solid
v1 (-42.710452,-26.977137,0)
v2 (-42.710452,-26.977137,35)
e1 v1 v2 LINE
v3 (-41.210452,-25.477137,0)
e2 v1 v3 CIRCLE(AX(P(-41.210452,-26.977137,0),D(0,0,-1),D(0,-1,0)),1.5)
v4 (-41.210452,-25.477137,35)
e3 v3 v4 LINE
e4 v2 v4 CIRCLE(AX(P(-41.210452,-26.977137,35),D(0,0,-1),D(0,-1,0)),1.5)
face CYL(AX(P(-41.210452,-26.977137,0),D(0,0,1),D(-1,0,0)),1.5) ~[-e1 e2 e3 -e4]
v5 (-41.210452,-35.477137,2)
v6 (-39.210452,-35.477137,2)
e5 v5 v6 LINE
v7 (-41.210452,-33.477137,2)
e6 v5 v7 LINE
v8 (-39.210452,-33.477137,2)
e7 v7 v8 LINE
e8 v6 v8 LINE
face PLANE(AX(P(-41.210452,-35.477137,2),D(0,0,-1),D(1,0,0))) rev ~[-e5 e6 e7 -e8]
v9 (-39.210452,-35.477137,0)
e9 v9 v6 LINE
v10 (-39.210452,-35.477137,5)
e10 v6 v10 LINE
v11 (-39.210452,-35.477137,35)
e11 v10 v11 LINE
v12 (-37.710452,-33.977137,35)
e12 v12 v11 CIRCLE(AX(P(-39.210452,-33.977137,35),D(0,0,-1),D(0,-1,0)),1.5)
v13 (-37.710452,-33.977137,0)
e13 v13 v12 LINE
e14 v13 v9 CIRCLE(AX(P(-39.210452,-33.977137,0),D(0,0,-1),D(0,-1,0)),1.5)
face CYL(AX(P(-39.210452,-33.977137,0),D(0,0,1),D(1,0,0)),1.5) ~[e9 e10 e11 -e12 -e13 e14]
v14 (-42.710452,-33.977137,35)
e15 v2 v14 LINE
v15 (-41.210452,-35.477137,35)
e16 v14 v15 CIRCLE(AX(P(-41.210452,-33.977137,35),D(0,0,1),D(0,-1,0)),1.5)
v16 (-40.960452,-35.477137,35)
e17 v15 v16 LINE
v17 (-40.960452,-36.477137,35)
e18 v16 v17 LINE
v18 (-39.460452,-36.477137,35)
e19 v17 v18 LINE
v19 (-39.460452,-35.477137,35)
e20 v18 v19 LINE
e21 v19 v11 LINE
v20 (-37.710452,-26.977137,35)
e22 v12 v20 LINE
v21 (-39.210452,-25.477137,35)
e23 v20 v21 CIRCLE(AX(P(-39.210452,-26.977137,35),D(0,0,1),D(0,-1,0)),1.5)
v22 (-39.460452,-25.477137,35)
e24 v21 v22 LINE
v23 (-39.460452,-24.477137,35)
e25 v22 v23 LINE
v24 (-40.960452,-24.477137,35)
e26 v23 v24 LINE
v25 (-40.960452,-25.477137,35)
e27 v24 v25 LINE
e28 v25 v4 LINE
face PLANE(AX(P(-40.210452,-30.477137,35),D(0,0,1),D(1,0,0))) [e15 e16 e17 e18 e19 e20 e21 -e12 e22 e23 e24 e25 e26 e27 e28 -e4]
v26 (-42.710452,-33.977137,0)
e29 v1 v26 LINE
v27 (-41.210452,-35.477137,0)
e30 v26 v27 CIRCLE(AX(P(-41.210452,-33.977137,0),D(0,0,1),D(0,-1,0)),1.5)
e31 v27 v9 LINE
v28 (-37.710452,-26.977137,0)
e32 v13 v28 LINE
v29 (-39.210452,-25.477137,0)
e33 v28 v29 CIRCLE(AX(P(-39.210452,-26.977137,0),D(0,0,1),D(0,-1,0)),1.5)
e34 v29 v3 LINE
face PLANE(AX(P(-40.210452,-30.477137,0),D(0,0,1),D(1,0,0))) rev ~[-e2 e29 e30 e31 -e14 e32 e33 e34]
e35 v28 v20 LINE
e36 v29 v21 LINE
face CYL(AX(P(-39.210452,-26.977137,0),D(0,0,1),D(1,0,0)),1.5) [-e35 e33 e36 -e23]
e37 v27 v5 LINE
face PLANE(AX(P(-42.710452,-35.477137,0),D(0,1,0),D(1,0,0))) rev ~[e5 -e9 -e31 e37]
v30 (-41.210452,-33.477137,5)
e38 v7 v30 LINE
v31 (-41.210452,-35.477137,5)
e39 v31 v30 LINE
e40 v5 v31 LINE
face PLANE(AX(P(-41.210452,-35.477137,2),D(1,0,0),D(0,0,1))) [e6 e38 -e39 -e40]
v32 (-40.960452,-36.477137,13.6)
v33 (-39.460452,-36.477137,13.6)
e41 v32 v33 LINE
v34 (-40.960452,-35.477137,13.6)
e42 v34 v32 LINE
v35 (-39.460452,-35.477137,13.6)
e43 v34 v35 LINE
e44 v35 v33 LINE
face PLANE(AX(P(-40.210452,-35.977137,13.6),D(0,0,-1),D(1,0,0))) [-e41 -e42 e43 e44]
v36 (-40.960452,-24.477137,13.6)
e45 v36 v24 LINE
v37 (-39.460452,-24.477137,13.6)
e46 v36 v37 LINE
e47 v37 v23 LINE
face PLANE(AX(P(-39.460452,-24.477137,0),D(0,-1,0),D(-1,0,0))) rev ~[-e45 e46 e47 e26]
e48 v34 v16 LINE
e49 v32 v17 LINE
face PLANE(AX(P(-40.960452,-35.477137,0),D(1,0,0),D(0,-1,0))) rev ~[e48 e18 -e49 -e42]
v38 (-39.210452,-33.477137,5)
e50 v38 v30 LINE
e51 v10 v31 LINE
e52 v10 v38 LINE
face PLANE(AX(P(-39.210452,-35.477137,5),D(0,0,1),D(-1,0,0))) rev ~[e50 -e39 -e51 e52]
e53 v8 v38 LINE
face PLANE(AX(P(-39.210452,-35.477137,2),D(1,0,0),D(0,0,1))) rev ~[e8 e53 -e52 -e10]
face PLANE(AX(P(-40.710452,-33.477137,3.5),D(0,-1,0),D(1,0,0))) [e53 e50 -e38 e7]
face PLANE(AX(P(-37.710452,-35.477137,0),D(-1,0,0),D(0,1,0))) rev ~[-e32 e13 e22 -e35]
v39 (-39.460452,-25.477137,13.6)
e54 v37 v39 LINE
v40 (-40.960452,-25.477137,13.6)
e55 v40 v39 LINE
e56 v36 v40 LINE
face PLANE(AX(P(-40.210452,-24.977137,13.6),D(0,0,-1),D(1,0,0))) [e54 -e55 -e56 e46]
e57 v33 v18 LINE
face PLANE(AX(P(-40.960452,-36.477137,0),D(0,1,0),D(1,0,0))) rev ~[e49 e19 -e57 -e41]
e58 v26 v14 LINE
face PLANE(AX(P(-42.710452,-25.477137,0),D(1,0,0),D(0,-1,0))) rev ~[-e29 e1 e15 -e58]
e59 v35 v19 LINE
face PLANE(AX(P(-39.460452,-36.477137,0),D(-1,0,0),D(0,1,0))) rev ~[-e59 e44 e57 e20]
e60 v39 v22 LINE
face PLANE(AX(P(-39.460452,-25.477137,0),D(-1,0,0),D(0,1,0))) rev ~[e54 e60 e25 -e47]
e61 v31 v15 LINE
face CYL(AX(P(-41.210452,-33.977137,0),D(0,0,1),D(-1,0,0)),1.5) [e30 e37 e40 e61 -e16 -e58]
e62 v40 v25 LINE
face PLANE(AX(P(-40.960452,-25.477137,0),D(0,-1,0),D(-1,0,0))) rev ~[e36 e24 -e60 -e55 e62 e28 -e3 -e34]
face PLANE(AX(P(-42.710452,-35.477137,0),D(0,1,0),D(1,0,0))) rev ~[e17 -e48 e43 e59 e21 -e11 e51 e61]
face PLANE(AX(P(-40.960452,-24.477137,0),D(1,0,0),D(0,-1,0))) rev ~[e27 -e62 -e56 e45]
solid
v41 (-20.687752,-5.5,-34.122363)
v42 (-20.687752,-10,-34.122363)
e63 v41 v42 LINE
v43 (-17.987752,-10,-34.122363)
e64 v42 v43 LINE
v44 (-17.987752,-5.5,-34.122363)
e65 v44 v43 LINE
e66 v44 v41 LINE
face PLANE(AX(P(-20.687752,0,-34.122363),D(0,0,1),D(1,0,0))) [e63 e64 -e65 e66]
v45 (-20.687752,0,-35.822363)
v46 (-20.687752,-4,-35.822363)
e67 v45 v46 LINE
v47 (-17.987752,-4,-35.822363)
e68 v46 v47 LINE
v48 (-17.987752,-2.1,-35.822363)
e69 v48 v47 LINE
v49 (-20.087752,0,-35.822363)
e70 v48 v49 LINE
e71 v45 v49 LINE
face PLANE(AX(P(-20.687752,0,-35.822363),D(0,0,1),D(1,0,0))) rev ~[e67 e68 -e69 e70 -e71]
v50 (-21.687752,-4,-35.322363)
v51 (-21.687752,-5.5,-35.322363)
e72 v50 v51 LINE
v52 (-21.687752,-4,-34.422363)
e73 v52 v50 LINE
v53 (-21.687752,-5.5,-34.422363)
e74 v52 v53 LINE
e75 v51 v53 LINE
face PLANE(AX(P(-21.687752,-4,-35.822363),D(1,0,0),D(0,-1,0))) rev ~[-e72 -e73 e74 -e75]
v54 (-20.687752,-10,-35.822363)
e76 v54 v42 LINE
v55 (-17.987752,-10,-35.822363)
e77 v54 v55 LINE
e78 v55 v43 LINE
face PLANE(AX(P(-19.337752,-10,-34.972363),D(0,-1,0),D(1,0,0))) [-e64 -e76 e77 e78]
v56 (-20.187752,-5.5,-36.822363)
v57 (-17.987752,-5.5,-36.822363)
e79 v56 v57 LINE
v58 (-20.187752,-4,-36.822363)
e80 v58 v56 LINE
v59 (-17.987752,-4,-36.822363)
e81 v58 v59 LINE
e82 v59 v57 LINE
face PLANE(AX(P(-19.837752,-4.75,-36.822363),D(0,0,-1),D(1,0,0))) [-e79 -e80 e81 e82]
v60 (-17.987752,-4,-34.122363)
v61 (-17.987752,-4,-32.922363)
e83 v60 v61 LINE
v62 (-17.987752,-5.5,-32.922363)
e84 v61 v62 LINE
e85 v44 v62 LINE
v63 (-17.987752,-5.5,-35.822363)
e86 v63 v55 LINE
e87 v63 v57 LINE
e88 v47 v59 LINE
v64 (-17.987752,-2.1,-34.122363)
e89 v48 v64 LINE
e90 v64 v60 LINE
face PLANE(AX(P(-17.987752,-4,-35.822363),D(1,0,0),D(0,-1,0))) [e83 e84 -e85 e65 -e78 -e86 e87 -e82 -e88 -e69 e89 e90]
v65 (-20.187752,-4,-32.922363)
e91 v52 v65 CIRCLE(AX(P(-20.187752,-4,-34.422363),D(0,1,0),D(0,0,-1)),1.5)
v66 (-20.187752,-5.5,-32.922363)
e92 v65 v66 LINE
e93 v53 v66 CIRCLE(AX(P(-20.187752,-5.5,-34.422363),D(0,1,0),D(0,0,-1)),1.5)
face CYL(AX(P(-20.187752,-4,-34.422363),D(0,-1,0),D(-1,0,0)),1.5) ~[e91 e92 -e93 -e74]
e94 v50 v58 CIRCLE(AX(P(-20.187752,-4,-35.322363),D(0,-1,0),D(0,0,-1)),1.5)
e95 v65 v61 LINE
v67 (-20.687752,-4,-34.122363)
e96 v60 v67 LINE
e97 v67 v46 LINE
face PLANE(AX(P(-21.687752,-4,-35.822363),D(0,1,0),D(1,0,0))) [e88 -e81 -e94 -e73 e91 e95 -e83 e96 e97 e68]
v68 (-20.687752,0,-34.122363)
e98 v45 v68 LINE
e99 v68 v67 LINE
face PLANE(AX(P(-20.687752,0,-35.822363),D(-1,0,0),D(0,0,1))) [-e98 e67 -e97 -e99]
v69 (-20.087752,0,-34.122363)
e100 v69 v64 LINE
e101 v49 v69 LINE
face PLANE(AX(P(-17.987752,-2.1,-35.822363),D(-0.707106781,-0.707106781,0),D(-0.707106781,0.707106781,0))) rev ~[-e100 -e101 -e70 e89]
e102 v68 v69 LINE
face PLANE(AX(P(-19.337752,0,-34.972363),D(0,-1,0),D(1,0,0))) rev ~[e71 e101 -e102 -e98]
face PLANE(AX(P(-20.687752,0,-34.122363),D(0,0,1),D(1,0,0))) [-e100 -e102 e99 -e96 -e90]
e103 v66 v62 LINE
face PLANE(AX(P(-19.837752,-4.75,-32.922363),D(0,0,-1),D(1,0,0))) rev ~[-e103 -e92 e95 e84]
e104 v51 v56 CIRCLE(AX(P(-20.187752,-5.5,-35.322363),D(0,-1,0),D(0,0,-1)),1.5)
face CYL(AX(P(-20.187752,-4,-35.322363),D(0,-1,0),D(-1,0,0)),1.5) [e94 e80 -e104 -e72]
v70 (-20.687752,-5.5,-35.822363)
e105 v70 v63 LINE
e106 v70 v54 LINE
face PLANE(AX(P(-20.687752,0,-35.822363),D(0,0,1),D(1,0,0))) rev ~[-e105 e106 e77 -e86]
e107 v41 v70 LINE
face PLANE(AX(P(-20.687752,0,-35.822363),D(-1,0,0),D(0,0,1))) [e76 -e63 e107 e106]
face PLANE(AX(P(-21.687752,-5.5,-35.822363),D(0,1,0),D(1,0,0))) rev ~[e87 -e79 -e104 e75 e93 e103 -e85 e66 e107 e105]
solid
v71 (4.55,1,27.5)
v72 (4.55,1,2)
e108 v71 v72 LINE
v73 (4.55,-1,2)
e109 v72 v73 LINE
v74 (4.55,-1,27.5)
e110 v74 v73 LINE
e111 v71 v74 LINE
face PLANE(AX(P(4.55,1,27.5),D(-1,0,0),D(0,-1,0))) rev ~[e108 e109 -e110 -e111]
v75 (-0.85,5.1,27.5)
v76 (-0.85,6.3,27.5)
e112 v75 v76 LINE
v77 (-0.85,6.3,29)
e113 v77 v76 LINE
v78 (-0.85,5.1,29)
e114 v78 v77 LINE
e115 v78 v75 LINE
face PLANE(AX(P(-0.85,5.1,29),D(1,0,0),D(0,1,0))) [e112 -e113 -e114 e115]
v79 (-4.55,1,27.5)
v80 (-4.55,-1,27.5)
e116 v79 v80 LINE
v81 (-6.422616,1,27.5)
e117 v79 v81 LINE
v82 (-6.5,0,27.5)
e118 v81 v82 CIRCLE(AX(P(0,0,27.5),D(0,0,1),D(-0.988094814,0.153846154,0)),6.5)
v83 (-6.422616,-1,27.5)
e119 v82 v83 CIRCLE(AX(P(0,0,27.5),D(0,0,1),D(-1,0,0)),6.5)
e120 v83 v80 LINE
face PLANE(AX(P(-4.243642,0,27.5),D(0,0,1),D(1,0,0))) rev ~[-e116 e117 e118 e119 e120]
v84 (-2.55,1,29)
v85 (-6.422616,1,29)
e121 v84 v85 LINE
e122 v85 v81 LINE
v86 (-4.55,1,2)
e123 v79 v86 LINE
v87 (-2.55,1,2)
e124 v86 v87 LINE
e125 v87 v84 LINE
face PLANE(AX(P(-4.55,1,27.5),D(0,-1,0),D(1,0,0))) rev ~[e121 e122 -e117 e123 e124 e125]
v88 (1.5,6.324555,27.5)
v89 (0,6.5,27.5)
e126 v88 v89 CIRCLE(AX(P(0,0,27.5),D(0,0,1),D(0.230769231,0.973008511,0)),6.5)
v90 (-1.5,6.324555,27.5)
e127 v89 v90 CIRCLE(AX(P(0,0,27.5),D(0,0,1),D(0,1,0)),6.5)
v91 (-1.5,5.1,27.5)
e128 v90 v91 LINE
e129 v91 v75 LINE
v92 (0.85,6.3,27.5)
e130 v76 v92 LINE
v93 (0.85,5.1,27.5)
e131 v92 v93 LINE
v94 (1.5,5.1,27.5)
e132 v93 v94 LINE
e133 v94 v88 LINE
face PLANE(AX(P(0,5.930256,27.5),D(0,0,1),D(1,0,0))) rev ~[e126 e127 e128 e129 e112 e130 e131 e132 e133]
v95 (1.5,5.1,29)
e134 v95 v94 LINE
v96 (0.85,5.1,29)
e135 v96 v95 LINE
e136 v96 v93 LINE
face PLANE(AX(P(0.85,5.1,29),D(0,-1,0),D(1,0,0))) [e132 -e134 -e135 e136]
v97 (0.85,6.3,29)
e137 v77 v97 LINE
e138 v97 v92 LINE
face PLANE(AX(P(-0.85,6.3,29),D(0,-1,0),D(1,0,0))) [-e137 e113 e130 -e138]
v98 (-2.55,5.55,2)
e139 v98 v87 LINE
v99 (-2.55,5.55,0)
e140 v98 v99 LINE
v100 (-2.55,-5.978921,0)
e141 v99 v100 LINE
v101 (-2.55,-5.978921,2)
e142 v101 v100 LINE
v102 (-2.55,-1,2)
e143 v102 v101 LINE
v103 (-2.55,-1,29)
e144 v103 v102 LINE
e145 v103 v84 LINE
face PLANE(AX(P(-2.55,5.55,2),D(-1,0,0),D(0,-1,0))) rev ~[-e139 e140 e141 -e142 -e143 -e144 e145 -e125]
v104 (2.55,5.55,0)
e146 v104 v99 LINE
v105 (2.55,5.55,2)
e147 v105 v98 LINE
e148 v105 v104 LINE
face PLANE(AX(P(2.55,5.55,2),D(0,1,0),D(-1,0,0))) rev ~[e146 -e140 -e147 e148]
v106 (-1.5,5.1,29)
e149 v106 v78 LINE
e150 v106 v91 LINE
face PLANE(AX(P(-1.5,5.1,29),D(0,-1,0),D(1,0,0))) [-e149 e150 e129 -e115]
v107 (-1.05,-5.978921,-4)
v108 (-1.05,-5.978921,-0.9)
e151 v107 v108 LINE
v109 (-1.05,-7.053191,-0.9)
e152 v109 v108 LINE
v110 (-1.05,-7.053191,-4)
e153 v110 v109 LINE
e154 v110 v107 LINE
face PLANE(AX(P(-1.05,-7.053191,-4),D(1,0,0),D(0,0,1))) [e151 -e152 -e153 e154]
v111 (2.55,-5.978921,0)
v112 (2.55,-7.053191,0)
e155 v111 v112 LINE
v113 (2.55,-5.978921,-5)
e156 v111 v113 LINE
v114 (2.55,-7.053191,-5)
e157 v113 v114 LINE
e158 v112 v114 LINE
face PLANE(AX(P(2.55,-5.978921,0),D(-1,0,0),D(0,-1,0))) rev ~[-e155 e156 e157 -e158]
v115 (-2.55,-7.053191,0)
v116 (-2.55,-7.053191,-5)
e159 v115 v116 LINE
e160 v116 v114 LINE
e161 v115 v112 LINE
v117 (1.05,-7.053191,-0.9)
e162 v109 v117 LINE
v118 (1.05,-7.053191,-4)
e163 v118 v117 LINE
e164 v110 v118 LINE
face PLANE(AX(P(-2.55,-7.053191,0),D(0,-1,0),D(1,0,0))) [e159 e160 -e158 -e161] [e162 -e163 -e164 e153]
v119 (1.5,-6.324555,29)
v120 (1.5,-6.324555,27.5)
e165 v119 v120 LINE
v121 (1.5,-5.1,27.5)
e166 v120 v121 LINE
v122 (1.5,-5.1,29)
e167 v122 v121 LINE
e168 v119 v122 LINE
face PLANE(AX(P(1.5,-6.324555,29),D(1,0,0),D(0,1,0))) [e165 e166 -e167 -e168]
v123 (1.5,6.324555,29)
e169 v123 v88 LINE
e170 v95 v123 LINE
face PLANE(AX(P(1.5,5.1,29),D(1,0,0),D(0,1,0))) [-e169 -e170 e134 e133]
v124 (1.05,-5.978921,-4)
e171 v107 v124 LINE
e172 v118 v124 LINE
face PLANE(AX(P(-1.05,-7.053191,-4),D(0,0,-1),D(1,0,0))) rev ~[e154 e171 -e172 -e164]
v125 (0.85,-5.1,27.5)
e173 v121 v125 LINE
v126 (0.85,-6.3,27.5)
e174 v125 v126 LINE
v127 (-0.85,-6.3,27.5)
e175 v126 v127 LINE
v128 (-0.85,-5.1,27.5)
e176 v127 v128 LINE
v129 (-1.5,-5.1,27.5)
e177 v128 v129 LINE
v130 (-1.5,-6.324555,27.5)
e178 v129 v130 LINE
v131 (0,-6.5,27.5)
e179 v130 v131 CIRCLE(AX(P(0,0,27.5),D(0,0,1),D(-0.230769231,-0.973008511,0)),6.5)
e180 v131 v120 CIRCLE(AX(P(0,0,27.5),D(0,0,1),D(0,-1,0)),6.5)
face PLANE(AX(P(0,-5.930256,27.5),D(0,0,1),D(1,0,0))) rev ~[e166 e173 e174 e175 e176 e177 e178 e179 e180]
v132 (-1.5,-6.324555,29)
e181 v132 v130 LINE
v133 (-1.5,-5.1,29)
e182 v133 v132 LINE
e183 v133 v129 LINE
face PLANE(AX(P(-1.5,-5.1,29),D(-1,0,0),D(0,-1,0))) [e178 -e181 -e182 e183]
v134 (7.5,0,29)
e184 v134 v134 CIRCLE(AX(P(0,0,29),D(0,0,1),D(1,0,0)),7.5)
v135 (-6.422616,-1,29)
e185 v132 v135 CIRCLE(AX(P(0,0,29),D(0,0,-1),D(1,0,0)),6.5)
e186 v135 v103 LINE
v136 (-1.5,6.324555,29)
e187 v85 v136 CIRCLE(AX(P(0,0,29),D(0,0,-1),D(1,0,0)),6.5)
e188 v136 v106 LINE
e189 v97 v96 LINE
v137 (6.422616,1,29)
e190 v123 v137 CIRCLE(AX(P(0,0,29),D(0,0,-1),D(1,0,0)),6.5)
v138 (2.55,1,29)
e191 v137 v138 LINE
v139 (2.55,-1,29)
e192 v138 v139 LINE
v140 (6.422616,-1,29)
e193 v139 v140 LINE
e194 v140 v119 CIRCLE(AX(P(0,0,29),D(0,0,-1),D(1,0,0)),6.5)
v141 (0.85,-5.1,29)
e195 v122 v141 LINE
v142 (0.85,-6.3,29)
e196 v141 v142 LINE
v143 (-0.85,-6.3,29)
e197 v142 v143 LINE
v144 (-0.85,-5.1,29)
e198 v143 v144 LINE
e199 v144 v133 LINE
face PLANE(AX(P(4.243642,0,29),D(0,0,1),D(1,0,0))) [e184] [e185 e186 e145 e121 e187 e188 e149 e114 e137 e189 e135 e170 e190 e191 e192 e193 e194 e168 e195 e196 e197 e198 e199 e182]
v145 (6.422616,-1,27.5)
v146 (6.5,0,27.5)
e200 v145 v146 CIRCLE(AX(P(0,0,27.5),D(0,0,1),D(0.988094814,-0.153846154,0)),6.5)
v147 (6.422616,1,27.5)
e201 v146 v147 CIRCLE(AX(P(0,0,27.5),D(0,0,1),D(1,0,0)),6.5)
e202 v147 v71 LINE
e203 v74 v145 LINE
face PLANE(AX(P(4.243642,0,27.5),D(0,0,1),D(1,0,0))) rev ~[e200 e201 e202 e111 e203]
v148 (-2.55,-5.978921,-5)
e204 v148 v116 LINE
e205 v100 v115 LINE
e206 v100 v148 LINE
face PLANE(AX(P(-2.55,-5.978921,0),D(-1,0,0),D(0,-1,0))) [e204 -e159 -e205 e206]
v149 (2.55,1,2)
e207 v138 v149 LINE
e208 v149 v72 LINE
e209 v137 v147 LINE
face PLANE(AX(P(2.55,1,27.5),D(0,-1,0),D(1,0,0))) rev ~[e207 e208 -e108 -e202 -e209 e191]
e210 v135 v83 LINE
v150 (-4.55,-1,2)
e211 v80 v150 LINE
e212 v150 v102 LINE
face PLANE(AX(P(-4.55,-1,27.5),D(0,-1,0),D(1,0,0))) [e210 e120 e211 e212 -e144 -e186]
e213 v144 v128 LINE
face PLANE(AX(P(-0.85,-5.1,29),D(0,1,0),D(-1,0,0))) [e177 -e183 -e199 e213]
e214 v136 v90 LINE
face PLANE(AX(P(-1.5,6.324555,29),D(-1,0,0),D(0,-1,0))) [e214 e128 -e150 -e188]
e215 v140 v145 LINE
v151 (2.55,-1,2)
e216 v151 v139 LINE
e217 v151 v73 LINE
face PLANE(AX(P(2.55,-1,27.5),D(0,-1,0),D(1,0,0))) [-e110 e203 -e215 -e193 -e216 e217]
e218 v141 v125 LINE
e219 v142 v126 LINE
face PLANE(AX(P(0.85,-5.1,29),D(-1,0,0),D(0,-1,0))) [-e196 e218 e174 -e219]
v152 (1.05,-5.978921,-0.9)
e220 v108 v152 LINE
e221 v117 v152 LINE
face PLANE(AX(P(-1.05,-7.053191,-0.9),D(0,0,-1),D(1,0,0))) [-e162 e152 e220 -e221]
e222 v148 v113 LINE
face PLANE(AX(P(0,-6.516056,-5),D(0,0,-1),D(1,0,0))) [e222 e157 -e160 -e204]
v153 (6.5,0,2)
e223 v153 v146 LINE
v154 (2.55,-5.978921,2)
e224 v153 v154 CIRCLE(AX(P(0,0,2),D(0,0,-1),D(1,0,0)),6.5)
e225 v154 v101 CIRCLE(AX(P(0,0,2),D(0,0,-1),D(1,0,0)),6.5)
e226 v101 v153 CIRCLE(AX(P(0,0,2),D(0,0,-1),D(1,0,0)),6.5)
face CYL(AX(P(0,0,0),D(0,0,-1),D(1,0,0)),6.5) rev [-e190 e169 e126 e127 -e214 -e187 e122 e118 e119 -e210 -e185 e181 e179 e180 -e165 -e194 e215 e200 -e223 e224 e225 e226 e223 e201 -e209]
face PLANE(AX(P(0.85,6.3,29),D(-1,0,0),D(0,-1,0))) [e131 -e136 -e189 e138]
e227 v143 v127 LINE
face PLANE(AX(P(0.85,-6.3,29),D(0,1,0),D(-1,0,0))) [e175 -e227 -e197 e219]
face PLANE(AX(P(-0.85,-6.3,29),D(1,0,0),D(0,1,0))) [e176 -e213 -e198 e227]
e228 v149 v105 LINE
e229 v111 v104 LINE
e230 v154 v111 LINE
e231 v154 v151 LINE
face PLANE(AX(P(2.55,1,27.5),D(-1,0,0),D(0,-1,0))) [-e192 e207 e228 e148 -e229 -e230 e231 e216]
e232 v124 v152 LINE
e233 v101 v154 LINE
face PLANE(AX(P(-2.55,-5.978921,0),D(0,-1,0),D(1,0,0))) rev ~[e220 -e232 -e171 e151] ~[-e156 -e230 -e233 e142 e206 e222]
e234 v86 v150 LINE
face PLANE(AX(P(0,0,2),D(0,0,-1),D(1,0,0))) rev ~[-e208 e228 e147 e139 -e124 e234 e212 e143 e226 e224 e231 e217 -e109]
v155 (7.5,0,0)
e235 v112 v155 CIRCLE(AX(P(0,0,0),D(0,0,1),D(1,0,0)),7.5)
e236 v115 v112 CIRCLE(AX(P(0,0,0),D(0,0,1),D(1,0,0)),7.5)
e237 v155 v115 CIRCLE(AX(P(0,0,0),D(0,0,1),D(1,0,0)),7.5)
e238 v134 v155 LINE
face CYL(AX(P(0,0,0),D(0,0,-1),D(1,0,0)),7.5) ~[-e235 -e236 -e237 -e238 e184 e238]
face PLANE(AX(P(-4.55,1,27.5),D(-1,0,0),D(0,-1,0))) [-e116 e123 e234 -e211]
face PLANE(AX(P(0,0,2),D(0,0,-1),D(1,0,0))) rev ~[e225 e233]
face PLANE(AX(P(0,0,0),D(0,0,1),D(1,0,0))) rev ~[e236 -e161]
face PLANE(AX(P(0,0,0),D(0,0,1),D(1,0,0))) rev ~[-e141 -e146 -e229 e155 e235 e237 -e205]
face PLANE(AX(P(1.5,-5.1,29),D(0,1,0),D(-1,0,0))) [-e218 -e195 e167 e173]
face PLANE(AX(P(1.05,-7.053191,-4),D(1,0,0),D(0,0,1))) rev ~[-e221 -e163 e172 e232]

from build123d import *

# Parameters (mm, degrees)
F0_R           = 7.5
F1_DEPTH       = 29
F2_R           = 6.5
F3_DEPTH       = 30
F4_R           = 7.5
F4_R_2         = 6.5
F5_DEPTH       = 2
F7_DEPTH       = 35
F9_DEPTH       = 1.5
F10_W          = 1.5
F10_H          = 1
F11_DEPTH      = 13.6
F13_DEPTH      = 25
F14_R          = 1.5
F15_W          = 1
F15_H          = 3
F16_DEPTH      = 2
F17_W          = 5.1
F17_H          = 1.0742694599
F18_DEPTH      = 5
F19_W          = 2.1
F19_H          = 3.1
F20_DEPTH      = 25
F21_W          = 2.7
F21_H          = 1.7
F22_DEPTH      = 10
F24_DEPTH      = 25
F25_W          = 2
F25_H          = 2
F26_DEPTH      = 25.5
F27_W          = 3.7
F27_H          = 1.5
F28_DEPTH      = 1
F28_DEPTH_BACK = 2.9
F29_R          = 1.5


# Not quite as in the source:
# - a feature names something its author has since deleted; it is built from what else it names


with BuildPart() as f1:
    # F0 (on Top) → F1 (new body)
    with BuildSketch(Plane.XY):
        Circle(F0_R)
    extrude(amount=F1_DEPTH)

    # F2 (on Top) → F3 (cut)
    with BuildSketch(Plane.XY):
        Circle(F2_R)
    extrude(amount=F3_DEPTH, mode=Mode.SUBTRACT)

    # F4 (on face) → F5 (join)
    with BuildSketch(Plane(origin=(0, 0, 0), x_dir=(1, 0, 0), z_dir=(0, 0, -1))):
        Circle(F4_R)
        Circle(F4_R_2, mode=Mode.SUBTRACT)
        Circle(F4_R_2)
    extrude(amount=-F5_DEPTH)

    # F8 (on face) → F9 (join)
    with BuildSketch(Plane.XY.offset(29)):
        with BuildLine():
            Line((-2.55, 1), (-5.9160797831, 1))
            ThreePointArc((-5.9160797831, 1), (-6, 0), (-5.9160797831, -1))
            Line((-5.9160797831, -1), (-2.55, -1))
            Line((-2.55, -1), (-2.55, 1))
        make_face()
        with BuildLine():
            ThreePointArc((5.9160797831, -1), (6, 0), (5.9160797831, 1))
            Line((5.9160797831, 1), (2.55, 1))
            Line((2.55, 1), (2.55, -1))
            Line((2.55, -1), (5.9160797831, -1))
        make_face()
        with BuildLine():
            ThreePointArc((-5.9160797831, -1), (-6, 0), (-5.9160797831, 1))
            Line((-5.9160797831, 1), (-6.4226162893, 1))
            ThreePointArc((-6.4226162893, 1), (-6.4806251967, 0.5014948252), (-6.5, 0))
            ThreePointArc((-6.5, 0), (-6.4806251967, -0.5014948252), (-6.4226162893, -1))
            Line((-6.4226162893, -1), (-5.9160797831, -1))
        make_face()
        with BuildLine():
            ThreePointArc((6.5, 0), (6.4806251967, 0.5014948252), (6.4226162893, 1))
            Line((6.4226162893, 1), (5.9160797831, 1))
            ThreePointArc((5.9160797831, 1), (6, 0), (5.9160797831, -1))
            Line((5.9160797831, -1), (6.4226162893, -1))
            ThreePointArc((6.4226162893, -1), (6.4806251967, -0.5014948252), (6.5, 0))
        make_face()
        with BuildLine():
            ThreePointArc((0, 6.5), (-0.7551127127, 6.4559898382), (-1.5, 6.3245553203))
            Line((-1.5, 6.3245553203), (-1.5, 5.1))
            Line((-1.5, 5.1), (-0.85, 5.1))
            Line((-0.85, 5.1), (-0.85, 6.3))
            Line((-0.85, 6.3), (0.85, 6.3))
            Line((0.85, 6.3), (0.85, 5.1))
            Line((0.85, 5.1), (1.5, 5.1))
            Line((1.5, 5.1), (1.5, 6.3245553203))
            ThreePointArc((1.5, 6.3245553203), (0.7551127127, 6.4559898382), (0, 6.5))
        make_face()
        with BuildLine():
            Line((-1.5, -5.1), (-1.5, -6.3245553203))
            ThreePointArc((-1.5, -6.3245553203), (-0.7551127127, -6.4559898382), (0, -6.5))
            ThreePointArc((0, -6.5), (0.7551127127, -6.4559898382), (1.5, -6.3245553203))
            Line((1.5, -6.3245553203), (1.5, -5.1))
            Line((1.5, -5.1), (0.85, -5.1))
            Line((0.85, -5.1), (0.85, -6.3))
            Line((0.85, -6.3), (-0.85, -6.3))
            Line((-0.85, -6.3), (-0.85, -5.1))
            Line((-0.85, -5.1), (-1.5, -5.1))
        make_face()
    extrude(amount=-F9_DEPTH)

    # F12 (on face) → F13 (cut)
    with BuildSketch(Plane.XY.offset(2)):
        Polygon((-2.55, 5.55), (-2.55, 1), (-2.55, -1), (-2.55, -5.9789213074), (2.55, -5.9789213074), (2.55, -1), (2.55, 1), (2.55, 5.55), (-0.3, 5.55), (-1, 5.55), align=None)
    extrude(amount=-F13_DEPTH, mode=Mode.SUBTRACT)

    # F17 (on face) → F18 (join)
    with BuildSketch(Plane(origin=(0, 0, 0), x_dir=(1, 0, 0), z_dir=(0, 0, -1))):
        with Locations((0, 6.5160560373)):
            Rectangle(F17_W, F17_H)
    extrude(amount=F18_DEPTH)

    # F19 (on face) → F20 (cut)
    with BuildSketch(Plane.XZ.offset(7.0531907673)):
        with Locations((0, -2.45)):
            Rectangle(F19_W, F19_H)
    extrude(amount=-F20_DEPTH, mode=Mode.SUBTRACT)

    # F25 (on face) → F26 (join, through all)
    with BuildSketch(Plane(origin=(0, 0, 27.5), x_dir=(1, 0, 0), z_dir=(0, 0, -1))):
        with Locations((3.55, 0)):
            Rectangle(F25_W, F25_H)
        with Locations((-3.55, 0)):
            Rectangle(F25_W, F25_H)
    extrude(amount=F26_DEPTH)


with BuildPart() as f7:
    # F6 (on Top) → F7 (new body)
    with BuildSketch(Plane.XY):
        Polygon((-42.7104520947, -25.4771374032), (-42.7104520947, -35.4771374032), (-40.9604520947, -35.4771374032), (-40.9604520947, -36.4771374032), (-39.4604520947, -36.4771374032), (-39.4604520947, -35.4771374032), (-37.7104520947, -35.4771374032), (-37.7104520947, -25.4771374032), (-39.4604520947, -25.4771374032), (-39.4604520947, -24.4771374032), (-40.9604520947, -24.4771374032), (-40.9604520947, -25.4771374032), align=None)
    extrude(amount=F7_DEPTH)

    # F10 (on face) → F11 (cut)
    with BuildSketch(Plane(origin=(0, 0, 0), x_dir=(1, 0, 0), z_dir=(0, 0, -1))):
        with Locations((-40.2104520947, 24.9771374032)):
            Rectangle(F10_W, F10_H)
        with Locations((-40.2104520947, 35.9771374032)):
            Rectangle(F10_W, F10_H)
    extrude(amount=-F11_DEPTH, mode=Mode.SUBTRACT)

    # F14
    f14_edges = [f7.edges().sort_by_distance(p)[0] for p in [
        (-42.710452, -25.477137, 17.5),
        (-37.710452, -25.477137, 17.5),
        (-37.710452, -35.477137, 17.5),
        (-42.710452, -35.477137, 17.5),
    ]]
    fillet(f14_edges, radius=F14_R)

    # F15 (on face) → F16 (cut)
    with BuildSketch(Plane.XZ.offset(35.4771374032)):
        with Locations((-40.7104520947, 3.5)):
            Rectangle(F15_W, F15_H)
        with Locations((-39.7104520947, 3.5)):
            Rectangle(F15_W, F15_H)
    extrude(amount=-F16_DEPTH, mode=Mode.SUBTRACT)


with BuildPart() as f22:
    # F21 (on Front) → F22 (new body)
    with BuildSketch(Plane.XZ):
        with Locations((-19.3377515213, -34.9723634064)):
            Rectangle(F21_W, F21_H)
    extrude(amount=F22_DEPTH)

    # F23 (on face) → F24 (cut)
    with BuildSketch(Plane(origin=(0, 0, -35.8223634064), x_dir=(1, 0, 0), z_dir=(0, 0, -1))):
        Polygon((-17.9877515213, 0), (-17.9877515213, 2.1), (-20.0877515213, 0), align=None)
    extrude(amount=-F24_DEPTH, mode=Mode.SUBTRACT)

    # F27 (on face) → F28 (join, two sides)
    with BuildSketch(Plane(origin=(0, 0, -35.8223634064), x_dir=(1, 0, 0), z_dir=(0, 0, -1))) as f28_sk:
        with Locations((-19.8377515213, 4.75)):
            Rectangle(F27_W, F27_H)
    extrude(amount=F28_DEPTH)
    extrude(f28_sk.sketch, amount=-F28_DEPTH_BACK)

    # F29
    f29_edges = [f22.edges().sort_by_distance(p)[0] for p in [
        (-21.687752, -4.75, -36.822363),
        (-21.687752, -4.75, -32.922363),
    ]]
    fillet(f29_edges, radius=F29_R)


solid = Compound([f1.part, f7.part, f22.part])
